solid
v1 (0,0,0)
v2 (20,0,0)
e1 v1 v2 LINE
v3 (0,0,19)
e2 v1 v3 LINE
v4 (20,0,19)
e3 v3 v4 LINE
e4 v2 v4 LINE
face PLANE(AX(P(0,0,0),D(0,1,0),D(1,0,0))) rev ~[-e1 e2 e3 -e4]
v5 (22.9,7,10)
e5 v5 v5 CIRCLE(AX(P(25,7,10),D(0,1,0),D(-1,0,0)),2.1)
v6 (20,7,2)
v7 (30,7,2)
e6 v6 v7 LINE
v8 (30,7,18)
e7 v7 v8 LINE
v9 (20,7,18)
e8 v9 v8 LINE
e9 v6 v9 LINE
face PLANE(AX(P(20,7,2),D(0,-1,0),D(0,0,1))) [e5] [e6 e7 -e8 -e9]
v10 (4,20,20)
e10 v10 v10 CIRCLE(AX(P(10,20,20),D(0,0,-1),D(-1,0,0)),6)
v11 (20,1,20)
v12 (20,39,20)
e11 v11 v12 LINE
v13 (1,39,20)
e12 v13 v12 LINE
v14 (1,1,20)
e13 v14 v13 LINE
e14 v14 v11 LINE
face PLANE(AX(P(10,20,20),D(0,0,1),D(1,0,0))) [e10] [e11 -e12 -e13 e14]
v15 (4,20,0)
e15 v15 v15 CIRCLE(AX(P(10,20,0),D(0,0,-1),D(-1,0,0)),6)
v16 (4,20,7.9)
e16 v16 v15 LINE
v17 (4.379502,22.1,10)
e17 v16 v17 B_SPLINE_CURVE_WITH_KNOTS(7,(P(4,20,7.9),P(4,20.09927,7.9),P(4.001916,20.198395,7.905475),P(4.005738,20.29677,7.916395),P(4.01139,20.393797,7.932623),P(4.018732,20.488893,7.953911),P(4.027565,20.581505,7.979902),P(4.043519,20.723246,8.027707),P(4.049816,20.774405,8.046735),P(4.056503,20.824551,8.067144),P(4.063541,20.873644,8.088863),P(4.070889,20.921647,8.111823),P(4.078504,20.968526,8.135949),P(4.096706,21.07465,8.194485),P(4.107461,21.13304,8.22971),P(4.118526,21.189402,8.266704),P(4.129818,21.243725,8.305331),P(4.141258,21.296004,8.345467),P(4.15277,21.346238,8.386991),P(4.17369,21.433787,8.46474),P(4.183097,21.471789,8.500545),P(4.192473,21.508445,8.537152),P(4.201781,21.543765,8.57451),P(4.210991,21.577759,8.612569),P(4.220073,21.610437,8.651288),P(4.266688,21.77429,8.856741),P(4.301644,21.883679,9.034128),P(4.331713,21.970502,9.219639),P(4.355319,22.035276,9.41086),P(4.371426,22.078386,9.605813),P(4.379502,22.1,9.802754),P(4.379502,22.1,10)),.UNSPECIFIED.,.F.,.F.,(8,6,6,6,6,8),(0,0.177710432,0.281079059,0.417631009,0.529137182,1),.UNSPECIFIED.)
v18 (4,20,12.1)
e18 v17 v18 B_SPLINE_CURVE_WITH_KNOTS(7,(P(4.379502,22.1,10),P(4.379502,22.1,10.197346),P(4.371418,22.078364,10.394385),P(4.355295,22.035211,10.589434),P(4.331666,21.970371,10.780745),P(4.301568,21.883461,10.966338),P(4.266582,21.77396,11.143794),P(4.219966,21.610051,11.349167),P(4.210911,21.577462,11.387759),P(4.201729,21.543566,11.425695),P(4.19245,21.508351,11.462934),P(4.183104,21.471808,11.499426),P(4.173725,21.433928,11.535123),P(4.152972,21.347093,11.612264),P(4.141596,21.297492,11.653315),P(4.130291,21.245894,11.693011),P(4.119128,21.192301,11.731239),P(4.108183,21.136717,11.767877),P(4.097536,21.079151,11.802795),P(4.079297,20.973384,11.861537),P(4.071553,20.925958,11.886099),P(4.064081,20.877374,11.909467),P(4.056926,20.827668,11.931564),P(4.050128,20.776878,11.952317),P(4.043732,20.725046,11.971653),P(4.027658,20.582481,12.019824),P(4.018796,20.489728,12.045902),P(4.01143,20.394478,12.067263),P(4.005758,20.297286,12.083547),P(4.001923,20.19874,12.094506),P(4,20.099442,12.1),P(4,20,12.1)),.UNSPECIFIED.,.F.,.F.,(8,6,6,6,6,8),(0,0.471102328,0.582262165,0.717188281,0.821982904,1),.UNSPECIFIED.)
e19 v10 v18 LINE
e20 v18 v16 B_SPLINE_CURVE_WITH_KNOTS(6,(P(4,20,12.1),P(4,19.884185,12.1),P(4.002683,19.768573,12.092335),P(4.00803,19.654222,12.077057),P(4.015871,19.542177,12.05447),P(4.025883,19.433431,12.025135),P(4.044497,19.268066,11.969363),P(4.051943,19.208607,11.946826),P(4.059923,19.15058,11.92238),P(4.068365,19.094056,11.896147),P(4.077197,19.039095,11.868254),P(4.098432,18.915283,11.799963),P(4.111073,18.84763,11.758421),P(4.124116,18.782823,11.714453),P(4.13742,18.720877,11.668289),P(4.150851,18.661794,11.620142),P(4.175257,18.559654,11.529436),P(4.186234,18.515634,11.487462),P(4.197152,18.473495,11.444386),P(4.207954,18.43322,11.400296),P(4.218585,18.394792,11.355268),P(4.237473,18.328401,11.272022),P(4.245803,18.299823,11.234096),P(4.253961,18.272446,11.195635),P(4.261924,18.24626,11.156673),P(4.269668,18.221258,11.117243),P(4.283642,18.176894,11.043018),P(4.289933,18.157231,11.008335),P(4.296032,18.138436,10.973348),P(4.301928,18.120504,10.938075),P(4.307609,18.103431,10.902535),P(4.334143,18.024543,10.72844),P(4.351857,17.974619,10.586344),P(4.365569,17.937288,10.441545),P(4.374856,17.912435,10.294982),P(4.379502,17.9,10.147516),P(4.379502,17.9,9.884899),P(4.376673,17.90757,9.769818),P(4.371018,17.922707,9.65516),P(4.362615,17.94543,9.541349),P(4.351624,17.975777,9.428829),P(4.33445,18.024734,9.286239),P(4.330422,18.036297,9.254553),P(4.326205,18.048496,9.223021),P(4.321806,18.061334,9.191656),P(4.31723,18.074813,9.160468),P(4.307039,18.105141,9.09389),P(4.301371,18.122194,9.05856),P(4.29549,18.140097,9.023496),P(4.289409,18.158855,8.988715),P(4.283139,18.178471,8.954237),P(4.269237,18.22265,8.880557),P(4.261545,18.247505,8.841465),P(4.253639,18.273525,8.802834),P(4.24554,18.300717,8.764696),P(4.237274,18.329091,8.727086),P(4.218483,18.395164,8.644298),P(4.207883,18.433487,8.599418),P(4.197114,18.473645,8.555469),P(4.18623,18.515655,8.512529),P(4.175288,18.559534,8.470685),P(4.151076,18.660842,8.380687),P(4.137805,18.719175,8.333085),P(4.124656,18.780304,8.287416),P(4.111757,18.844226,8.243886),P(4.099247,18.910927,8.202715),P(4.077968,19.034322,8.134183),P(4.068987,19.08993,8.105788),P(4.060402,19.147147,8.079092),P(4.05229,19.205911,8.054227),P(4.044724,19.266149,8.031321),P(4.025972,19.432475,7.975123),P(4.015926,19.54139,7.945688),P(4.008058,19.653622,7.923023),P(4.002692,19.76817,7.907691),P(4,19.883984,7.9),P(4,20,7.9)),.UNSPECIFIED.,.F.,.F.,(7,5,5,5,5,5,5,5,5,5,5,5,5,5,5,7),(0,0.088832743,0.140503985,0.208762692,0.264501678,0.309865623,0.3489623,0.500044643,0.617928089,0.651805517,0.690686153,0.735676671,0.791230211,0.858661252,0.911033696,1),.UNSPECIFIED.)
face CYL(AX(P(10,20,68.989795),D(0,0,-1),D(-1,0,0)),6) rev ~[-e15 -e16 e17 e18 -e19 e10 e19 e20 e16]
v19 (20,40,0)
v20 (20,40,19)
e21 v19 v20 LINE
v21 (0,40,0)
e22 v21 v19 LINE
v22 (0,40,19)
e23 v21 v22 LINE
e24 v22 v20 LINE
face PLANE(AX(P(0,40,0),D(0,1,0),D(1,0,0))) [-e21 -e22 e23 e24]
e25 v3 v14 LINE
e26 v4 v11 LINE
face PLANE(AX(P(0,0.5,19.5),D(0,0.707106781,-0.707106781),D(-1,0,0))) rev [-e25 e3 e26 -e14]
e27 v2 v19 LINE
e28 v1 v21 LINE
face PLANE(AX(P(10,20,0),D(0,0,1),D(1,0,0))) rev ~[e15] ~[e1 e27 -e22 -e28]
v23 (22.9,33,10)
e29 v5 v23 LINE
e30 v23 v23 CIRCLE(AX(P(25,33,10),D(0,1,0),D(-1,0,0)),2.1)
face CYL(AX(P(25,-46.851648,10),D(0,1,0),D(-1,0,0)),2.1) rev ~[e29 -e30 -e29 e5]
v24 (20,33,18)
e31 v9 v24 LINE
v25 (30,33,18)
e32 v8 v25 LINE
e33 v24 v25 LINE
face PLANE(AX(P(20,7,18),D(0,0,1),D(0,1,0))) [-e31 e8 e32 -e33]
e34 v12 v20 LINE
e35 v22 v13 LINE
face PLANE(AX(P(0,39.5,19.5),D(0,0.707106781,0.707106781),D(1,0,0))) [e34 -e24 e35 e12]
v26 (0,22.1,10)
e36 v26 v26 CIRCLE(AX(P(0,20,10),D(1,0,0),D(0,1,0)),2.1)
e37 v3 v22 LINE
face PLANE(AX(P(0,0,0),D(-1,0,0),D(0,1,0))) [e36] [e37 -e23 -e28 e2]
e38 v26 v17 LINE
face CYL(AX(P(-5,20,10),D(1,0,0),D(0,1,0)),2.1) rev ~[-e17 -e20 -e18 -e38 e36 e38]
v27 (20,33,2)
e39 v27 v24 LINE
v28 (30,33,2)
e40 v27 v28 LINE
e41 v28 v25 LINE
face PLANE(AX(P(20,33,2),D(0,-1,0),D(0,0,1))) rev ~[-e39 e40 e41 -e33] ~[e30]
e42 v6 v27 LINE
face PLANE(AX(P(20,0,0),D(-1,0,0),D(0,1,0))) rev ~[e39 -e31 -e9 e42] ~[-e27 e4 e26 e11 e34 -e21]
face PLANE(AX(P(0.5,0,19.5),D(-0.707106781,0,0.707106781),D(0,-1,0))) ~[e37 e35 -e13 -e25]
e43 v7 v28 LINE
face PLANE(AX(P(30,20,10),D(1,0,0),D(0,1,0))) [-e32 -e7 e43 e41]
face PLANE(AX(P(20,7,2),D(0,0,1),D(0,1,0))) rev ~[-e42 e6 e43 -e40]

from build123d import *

# Parameters (mm, degrees)
F0_W      = 20
F0_H      = 40
F1_DEPTH  = 20
F3_D      = 12
F5_D      = 4.2
F5_DEPTH  = 5
F5_TIP    = 1.2618073
F8_SIZE   = 1
F9_W      = 26
F9_H      = 16
F10_DEPTH = 10
F12_D     = 4.2


# Not quite as in the source:
# - a feature of the source that left no trace in its solid (it failed there, or was rolled back) is left out


with BuildPart() as f1:
    # F0 (on Top) → F1 (new body)
    with BuildSketch(Plane.XY):
        with Locations((10, 20)):
            Rectangle(F0_W, F0_H)
    extrude(amount=F1_DEPTH)

    # F3 (through all)
    with Locations(Plane.XY.offset(20)):
        with Locations((10, 20)):
            Hole(F3_D / 2)

    # F5
    with Locations(Plane(origin=(0, 0, 0), x_dir=(0, -1, 0), z_dir=(-1, 0, 0))):
        with Locations((-20, 10)):
            Hole(F5_D / 2, depth=F5_DEPTH)
            with Locations((0, 0, -(F5_DEPTH + F5_TIP / 2))):  # 118° drill point
                Cone(0, F5_D / 2, F5_TIP, mode=Mode.SUBTRACT)

    # F8
    f8_edges = [f1.edges().sort_by_distance(p)[0] for p in [
        (10, 0, 20),
        (0, 20, 20),
        (10, 40, 20),
    ]]
    chamfer(f8_edges, length=F8_SIZE)

    # F9 (on face) → F10 (join)
    with BuildSketch(Plane.YZ.offset(20)):
        with Locations((20, 10)):
            Rectangle(F9_W, F9_H)
    extrude(amount=F10_DEPTH)

    # F12 (through all)
    with Locations(Plane.XZ.offset(-7)):
        with Locations((25, 10)):
            Hole(F12_D / 2)


solid = f1.part
